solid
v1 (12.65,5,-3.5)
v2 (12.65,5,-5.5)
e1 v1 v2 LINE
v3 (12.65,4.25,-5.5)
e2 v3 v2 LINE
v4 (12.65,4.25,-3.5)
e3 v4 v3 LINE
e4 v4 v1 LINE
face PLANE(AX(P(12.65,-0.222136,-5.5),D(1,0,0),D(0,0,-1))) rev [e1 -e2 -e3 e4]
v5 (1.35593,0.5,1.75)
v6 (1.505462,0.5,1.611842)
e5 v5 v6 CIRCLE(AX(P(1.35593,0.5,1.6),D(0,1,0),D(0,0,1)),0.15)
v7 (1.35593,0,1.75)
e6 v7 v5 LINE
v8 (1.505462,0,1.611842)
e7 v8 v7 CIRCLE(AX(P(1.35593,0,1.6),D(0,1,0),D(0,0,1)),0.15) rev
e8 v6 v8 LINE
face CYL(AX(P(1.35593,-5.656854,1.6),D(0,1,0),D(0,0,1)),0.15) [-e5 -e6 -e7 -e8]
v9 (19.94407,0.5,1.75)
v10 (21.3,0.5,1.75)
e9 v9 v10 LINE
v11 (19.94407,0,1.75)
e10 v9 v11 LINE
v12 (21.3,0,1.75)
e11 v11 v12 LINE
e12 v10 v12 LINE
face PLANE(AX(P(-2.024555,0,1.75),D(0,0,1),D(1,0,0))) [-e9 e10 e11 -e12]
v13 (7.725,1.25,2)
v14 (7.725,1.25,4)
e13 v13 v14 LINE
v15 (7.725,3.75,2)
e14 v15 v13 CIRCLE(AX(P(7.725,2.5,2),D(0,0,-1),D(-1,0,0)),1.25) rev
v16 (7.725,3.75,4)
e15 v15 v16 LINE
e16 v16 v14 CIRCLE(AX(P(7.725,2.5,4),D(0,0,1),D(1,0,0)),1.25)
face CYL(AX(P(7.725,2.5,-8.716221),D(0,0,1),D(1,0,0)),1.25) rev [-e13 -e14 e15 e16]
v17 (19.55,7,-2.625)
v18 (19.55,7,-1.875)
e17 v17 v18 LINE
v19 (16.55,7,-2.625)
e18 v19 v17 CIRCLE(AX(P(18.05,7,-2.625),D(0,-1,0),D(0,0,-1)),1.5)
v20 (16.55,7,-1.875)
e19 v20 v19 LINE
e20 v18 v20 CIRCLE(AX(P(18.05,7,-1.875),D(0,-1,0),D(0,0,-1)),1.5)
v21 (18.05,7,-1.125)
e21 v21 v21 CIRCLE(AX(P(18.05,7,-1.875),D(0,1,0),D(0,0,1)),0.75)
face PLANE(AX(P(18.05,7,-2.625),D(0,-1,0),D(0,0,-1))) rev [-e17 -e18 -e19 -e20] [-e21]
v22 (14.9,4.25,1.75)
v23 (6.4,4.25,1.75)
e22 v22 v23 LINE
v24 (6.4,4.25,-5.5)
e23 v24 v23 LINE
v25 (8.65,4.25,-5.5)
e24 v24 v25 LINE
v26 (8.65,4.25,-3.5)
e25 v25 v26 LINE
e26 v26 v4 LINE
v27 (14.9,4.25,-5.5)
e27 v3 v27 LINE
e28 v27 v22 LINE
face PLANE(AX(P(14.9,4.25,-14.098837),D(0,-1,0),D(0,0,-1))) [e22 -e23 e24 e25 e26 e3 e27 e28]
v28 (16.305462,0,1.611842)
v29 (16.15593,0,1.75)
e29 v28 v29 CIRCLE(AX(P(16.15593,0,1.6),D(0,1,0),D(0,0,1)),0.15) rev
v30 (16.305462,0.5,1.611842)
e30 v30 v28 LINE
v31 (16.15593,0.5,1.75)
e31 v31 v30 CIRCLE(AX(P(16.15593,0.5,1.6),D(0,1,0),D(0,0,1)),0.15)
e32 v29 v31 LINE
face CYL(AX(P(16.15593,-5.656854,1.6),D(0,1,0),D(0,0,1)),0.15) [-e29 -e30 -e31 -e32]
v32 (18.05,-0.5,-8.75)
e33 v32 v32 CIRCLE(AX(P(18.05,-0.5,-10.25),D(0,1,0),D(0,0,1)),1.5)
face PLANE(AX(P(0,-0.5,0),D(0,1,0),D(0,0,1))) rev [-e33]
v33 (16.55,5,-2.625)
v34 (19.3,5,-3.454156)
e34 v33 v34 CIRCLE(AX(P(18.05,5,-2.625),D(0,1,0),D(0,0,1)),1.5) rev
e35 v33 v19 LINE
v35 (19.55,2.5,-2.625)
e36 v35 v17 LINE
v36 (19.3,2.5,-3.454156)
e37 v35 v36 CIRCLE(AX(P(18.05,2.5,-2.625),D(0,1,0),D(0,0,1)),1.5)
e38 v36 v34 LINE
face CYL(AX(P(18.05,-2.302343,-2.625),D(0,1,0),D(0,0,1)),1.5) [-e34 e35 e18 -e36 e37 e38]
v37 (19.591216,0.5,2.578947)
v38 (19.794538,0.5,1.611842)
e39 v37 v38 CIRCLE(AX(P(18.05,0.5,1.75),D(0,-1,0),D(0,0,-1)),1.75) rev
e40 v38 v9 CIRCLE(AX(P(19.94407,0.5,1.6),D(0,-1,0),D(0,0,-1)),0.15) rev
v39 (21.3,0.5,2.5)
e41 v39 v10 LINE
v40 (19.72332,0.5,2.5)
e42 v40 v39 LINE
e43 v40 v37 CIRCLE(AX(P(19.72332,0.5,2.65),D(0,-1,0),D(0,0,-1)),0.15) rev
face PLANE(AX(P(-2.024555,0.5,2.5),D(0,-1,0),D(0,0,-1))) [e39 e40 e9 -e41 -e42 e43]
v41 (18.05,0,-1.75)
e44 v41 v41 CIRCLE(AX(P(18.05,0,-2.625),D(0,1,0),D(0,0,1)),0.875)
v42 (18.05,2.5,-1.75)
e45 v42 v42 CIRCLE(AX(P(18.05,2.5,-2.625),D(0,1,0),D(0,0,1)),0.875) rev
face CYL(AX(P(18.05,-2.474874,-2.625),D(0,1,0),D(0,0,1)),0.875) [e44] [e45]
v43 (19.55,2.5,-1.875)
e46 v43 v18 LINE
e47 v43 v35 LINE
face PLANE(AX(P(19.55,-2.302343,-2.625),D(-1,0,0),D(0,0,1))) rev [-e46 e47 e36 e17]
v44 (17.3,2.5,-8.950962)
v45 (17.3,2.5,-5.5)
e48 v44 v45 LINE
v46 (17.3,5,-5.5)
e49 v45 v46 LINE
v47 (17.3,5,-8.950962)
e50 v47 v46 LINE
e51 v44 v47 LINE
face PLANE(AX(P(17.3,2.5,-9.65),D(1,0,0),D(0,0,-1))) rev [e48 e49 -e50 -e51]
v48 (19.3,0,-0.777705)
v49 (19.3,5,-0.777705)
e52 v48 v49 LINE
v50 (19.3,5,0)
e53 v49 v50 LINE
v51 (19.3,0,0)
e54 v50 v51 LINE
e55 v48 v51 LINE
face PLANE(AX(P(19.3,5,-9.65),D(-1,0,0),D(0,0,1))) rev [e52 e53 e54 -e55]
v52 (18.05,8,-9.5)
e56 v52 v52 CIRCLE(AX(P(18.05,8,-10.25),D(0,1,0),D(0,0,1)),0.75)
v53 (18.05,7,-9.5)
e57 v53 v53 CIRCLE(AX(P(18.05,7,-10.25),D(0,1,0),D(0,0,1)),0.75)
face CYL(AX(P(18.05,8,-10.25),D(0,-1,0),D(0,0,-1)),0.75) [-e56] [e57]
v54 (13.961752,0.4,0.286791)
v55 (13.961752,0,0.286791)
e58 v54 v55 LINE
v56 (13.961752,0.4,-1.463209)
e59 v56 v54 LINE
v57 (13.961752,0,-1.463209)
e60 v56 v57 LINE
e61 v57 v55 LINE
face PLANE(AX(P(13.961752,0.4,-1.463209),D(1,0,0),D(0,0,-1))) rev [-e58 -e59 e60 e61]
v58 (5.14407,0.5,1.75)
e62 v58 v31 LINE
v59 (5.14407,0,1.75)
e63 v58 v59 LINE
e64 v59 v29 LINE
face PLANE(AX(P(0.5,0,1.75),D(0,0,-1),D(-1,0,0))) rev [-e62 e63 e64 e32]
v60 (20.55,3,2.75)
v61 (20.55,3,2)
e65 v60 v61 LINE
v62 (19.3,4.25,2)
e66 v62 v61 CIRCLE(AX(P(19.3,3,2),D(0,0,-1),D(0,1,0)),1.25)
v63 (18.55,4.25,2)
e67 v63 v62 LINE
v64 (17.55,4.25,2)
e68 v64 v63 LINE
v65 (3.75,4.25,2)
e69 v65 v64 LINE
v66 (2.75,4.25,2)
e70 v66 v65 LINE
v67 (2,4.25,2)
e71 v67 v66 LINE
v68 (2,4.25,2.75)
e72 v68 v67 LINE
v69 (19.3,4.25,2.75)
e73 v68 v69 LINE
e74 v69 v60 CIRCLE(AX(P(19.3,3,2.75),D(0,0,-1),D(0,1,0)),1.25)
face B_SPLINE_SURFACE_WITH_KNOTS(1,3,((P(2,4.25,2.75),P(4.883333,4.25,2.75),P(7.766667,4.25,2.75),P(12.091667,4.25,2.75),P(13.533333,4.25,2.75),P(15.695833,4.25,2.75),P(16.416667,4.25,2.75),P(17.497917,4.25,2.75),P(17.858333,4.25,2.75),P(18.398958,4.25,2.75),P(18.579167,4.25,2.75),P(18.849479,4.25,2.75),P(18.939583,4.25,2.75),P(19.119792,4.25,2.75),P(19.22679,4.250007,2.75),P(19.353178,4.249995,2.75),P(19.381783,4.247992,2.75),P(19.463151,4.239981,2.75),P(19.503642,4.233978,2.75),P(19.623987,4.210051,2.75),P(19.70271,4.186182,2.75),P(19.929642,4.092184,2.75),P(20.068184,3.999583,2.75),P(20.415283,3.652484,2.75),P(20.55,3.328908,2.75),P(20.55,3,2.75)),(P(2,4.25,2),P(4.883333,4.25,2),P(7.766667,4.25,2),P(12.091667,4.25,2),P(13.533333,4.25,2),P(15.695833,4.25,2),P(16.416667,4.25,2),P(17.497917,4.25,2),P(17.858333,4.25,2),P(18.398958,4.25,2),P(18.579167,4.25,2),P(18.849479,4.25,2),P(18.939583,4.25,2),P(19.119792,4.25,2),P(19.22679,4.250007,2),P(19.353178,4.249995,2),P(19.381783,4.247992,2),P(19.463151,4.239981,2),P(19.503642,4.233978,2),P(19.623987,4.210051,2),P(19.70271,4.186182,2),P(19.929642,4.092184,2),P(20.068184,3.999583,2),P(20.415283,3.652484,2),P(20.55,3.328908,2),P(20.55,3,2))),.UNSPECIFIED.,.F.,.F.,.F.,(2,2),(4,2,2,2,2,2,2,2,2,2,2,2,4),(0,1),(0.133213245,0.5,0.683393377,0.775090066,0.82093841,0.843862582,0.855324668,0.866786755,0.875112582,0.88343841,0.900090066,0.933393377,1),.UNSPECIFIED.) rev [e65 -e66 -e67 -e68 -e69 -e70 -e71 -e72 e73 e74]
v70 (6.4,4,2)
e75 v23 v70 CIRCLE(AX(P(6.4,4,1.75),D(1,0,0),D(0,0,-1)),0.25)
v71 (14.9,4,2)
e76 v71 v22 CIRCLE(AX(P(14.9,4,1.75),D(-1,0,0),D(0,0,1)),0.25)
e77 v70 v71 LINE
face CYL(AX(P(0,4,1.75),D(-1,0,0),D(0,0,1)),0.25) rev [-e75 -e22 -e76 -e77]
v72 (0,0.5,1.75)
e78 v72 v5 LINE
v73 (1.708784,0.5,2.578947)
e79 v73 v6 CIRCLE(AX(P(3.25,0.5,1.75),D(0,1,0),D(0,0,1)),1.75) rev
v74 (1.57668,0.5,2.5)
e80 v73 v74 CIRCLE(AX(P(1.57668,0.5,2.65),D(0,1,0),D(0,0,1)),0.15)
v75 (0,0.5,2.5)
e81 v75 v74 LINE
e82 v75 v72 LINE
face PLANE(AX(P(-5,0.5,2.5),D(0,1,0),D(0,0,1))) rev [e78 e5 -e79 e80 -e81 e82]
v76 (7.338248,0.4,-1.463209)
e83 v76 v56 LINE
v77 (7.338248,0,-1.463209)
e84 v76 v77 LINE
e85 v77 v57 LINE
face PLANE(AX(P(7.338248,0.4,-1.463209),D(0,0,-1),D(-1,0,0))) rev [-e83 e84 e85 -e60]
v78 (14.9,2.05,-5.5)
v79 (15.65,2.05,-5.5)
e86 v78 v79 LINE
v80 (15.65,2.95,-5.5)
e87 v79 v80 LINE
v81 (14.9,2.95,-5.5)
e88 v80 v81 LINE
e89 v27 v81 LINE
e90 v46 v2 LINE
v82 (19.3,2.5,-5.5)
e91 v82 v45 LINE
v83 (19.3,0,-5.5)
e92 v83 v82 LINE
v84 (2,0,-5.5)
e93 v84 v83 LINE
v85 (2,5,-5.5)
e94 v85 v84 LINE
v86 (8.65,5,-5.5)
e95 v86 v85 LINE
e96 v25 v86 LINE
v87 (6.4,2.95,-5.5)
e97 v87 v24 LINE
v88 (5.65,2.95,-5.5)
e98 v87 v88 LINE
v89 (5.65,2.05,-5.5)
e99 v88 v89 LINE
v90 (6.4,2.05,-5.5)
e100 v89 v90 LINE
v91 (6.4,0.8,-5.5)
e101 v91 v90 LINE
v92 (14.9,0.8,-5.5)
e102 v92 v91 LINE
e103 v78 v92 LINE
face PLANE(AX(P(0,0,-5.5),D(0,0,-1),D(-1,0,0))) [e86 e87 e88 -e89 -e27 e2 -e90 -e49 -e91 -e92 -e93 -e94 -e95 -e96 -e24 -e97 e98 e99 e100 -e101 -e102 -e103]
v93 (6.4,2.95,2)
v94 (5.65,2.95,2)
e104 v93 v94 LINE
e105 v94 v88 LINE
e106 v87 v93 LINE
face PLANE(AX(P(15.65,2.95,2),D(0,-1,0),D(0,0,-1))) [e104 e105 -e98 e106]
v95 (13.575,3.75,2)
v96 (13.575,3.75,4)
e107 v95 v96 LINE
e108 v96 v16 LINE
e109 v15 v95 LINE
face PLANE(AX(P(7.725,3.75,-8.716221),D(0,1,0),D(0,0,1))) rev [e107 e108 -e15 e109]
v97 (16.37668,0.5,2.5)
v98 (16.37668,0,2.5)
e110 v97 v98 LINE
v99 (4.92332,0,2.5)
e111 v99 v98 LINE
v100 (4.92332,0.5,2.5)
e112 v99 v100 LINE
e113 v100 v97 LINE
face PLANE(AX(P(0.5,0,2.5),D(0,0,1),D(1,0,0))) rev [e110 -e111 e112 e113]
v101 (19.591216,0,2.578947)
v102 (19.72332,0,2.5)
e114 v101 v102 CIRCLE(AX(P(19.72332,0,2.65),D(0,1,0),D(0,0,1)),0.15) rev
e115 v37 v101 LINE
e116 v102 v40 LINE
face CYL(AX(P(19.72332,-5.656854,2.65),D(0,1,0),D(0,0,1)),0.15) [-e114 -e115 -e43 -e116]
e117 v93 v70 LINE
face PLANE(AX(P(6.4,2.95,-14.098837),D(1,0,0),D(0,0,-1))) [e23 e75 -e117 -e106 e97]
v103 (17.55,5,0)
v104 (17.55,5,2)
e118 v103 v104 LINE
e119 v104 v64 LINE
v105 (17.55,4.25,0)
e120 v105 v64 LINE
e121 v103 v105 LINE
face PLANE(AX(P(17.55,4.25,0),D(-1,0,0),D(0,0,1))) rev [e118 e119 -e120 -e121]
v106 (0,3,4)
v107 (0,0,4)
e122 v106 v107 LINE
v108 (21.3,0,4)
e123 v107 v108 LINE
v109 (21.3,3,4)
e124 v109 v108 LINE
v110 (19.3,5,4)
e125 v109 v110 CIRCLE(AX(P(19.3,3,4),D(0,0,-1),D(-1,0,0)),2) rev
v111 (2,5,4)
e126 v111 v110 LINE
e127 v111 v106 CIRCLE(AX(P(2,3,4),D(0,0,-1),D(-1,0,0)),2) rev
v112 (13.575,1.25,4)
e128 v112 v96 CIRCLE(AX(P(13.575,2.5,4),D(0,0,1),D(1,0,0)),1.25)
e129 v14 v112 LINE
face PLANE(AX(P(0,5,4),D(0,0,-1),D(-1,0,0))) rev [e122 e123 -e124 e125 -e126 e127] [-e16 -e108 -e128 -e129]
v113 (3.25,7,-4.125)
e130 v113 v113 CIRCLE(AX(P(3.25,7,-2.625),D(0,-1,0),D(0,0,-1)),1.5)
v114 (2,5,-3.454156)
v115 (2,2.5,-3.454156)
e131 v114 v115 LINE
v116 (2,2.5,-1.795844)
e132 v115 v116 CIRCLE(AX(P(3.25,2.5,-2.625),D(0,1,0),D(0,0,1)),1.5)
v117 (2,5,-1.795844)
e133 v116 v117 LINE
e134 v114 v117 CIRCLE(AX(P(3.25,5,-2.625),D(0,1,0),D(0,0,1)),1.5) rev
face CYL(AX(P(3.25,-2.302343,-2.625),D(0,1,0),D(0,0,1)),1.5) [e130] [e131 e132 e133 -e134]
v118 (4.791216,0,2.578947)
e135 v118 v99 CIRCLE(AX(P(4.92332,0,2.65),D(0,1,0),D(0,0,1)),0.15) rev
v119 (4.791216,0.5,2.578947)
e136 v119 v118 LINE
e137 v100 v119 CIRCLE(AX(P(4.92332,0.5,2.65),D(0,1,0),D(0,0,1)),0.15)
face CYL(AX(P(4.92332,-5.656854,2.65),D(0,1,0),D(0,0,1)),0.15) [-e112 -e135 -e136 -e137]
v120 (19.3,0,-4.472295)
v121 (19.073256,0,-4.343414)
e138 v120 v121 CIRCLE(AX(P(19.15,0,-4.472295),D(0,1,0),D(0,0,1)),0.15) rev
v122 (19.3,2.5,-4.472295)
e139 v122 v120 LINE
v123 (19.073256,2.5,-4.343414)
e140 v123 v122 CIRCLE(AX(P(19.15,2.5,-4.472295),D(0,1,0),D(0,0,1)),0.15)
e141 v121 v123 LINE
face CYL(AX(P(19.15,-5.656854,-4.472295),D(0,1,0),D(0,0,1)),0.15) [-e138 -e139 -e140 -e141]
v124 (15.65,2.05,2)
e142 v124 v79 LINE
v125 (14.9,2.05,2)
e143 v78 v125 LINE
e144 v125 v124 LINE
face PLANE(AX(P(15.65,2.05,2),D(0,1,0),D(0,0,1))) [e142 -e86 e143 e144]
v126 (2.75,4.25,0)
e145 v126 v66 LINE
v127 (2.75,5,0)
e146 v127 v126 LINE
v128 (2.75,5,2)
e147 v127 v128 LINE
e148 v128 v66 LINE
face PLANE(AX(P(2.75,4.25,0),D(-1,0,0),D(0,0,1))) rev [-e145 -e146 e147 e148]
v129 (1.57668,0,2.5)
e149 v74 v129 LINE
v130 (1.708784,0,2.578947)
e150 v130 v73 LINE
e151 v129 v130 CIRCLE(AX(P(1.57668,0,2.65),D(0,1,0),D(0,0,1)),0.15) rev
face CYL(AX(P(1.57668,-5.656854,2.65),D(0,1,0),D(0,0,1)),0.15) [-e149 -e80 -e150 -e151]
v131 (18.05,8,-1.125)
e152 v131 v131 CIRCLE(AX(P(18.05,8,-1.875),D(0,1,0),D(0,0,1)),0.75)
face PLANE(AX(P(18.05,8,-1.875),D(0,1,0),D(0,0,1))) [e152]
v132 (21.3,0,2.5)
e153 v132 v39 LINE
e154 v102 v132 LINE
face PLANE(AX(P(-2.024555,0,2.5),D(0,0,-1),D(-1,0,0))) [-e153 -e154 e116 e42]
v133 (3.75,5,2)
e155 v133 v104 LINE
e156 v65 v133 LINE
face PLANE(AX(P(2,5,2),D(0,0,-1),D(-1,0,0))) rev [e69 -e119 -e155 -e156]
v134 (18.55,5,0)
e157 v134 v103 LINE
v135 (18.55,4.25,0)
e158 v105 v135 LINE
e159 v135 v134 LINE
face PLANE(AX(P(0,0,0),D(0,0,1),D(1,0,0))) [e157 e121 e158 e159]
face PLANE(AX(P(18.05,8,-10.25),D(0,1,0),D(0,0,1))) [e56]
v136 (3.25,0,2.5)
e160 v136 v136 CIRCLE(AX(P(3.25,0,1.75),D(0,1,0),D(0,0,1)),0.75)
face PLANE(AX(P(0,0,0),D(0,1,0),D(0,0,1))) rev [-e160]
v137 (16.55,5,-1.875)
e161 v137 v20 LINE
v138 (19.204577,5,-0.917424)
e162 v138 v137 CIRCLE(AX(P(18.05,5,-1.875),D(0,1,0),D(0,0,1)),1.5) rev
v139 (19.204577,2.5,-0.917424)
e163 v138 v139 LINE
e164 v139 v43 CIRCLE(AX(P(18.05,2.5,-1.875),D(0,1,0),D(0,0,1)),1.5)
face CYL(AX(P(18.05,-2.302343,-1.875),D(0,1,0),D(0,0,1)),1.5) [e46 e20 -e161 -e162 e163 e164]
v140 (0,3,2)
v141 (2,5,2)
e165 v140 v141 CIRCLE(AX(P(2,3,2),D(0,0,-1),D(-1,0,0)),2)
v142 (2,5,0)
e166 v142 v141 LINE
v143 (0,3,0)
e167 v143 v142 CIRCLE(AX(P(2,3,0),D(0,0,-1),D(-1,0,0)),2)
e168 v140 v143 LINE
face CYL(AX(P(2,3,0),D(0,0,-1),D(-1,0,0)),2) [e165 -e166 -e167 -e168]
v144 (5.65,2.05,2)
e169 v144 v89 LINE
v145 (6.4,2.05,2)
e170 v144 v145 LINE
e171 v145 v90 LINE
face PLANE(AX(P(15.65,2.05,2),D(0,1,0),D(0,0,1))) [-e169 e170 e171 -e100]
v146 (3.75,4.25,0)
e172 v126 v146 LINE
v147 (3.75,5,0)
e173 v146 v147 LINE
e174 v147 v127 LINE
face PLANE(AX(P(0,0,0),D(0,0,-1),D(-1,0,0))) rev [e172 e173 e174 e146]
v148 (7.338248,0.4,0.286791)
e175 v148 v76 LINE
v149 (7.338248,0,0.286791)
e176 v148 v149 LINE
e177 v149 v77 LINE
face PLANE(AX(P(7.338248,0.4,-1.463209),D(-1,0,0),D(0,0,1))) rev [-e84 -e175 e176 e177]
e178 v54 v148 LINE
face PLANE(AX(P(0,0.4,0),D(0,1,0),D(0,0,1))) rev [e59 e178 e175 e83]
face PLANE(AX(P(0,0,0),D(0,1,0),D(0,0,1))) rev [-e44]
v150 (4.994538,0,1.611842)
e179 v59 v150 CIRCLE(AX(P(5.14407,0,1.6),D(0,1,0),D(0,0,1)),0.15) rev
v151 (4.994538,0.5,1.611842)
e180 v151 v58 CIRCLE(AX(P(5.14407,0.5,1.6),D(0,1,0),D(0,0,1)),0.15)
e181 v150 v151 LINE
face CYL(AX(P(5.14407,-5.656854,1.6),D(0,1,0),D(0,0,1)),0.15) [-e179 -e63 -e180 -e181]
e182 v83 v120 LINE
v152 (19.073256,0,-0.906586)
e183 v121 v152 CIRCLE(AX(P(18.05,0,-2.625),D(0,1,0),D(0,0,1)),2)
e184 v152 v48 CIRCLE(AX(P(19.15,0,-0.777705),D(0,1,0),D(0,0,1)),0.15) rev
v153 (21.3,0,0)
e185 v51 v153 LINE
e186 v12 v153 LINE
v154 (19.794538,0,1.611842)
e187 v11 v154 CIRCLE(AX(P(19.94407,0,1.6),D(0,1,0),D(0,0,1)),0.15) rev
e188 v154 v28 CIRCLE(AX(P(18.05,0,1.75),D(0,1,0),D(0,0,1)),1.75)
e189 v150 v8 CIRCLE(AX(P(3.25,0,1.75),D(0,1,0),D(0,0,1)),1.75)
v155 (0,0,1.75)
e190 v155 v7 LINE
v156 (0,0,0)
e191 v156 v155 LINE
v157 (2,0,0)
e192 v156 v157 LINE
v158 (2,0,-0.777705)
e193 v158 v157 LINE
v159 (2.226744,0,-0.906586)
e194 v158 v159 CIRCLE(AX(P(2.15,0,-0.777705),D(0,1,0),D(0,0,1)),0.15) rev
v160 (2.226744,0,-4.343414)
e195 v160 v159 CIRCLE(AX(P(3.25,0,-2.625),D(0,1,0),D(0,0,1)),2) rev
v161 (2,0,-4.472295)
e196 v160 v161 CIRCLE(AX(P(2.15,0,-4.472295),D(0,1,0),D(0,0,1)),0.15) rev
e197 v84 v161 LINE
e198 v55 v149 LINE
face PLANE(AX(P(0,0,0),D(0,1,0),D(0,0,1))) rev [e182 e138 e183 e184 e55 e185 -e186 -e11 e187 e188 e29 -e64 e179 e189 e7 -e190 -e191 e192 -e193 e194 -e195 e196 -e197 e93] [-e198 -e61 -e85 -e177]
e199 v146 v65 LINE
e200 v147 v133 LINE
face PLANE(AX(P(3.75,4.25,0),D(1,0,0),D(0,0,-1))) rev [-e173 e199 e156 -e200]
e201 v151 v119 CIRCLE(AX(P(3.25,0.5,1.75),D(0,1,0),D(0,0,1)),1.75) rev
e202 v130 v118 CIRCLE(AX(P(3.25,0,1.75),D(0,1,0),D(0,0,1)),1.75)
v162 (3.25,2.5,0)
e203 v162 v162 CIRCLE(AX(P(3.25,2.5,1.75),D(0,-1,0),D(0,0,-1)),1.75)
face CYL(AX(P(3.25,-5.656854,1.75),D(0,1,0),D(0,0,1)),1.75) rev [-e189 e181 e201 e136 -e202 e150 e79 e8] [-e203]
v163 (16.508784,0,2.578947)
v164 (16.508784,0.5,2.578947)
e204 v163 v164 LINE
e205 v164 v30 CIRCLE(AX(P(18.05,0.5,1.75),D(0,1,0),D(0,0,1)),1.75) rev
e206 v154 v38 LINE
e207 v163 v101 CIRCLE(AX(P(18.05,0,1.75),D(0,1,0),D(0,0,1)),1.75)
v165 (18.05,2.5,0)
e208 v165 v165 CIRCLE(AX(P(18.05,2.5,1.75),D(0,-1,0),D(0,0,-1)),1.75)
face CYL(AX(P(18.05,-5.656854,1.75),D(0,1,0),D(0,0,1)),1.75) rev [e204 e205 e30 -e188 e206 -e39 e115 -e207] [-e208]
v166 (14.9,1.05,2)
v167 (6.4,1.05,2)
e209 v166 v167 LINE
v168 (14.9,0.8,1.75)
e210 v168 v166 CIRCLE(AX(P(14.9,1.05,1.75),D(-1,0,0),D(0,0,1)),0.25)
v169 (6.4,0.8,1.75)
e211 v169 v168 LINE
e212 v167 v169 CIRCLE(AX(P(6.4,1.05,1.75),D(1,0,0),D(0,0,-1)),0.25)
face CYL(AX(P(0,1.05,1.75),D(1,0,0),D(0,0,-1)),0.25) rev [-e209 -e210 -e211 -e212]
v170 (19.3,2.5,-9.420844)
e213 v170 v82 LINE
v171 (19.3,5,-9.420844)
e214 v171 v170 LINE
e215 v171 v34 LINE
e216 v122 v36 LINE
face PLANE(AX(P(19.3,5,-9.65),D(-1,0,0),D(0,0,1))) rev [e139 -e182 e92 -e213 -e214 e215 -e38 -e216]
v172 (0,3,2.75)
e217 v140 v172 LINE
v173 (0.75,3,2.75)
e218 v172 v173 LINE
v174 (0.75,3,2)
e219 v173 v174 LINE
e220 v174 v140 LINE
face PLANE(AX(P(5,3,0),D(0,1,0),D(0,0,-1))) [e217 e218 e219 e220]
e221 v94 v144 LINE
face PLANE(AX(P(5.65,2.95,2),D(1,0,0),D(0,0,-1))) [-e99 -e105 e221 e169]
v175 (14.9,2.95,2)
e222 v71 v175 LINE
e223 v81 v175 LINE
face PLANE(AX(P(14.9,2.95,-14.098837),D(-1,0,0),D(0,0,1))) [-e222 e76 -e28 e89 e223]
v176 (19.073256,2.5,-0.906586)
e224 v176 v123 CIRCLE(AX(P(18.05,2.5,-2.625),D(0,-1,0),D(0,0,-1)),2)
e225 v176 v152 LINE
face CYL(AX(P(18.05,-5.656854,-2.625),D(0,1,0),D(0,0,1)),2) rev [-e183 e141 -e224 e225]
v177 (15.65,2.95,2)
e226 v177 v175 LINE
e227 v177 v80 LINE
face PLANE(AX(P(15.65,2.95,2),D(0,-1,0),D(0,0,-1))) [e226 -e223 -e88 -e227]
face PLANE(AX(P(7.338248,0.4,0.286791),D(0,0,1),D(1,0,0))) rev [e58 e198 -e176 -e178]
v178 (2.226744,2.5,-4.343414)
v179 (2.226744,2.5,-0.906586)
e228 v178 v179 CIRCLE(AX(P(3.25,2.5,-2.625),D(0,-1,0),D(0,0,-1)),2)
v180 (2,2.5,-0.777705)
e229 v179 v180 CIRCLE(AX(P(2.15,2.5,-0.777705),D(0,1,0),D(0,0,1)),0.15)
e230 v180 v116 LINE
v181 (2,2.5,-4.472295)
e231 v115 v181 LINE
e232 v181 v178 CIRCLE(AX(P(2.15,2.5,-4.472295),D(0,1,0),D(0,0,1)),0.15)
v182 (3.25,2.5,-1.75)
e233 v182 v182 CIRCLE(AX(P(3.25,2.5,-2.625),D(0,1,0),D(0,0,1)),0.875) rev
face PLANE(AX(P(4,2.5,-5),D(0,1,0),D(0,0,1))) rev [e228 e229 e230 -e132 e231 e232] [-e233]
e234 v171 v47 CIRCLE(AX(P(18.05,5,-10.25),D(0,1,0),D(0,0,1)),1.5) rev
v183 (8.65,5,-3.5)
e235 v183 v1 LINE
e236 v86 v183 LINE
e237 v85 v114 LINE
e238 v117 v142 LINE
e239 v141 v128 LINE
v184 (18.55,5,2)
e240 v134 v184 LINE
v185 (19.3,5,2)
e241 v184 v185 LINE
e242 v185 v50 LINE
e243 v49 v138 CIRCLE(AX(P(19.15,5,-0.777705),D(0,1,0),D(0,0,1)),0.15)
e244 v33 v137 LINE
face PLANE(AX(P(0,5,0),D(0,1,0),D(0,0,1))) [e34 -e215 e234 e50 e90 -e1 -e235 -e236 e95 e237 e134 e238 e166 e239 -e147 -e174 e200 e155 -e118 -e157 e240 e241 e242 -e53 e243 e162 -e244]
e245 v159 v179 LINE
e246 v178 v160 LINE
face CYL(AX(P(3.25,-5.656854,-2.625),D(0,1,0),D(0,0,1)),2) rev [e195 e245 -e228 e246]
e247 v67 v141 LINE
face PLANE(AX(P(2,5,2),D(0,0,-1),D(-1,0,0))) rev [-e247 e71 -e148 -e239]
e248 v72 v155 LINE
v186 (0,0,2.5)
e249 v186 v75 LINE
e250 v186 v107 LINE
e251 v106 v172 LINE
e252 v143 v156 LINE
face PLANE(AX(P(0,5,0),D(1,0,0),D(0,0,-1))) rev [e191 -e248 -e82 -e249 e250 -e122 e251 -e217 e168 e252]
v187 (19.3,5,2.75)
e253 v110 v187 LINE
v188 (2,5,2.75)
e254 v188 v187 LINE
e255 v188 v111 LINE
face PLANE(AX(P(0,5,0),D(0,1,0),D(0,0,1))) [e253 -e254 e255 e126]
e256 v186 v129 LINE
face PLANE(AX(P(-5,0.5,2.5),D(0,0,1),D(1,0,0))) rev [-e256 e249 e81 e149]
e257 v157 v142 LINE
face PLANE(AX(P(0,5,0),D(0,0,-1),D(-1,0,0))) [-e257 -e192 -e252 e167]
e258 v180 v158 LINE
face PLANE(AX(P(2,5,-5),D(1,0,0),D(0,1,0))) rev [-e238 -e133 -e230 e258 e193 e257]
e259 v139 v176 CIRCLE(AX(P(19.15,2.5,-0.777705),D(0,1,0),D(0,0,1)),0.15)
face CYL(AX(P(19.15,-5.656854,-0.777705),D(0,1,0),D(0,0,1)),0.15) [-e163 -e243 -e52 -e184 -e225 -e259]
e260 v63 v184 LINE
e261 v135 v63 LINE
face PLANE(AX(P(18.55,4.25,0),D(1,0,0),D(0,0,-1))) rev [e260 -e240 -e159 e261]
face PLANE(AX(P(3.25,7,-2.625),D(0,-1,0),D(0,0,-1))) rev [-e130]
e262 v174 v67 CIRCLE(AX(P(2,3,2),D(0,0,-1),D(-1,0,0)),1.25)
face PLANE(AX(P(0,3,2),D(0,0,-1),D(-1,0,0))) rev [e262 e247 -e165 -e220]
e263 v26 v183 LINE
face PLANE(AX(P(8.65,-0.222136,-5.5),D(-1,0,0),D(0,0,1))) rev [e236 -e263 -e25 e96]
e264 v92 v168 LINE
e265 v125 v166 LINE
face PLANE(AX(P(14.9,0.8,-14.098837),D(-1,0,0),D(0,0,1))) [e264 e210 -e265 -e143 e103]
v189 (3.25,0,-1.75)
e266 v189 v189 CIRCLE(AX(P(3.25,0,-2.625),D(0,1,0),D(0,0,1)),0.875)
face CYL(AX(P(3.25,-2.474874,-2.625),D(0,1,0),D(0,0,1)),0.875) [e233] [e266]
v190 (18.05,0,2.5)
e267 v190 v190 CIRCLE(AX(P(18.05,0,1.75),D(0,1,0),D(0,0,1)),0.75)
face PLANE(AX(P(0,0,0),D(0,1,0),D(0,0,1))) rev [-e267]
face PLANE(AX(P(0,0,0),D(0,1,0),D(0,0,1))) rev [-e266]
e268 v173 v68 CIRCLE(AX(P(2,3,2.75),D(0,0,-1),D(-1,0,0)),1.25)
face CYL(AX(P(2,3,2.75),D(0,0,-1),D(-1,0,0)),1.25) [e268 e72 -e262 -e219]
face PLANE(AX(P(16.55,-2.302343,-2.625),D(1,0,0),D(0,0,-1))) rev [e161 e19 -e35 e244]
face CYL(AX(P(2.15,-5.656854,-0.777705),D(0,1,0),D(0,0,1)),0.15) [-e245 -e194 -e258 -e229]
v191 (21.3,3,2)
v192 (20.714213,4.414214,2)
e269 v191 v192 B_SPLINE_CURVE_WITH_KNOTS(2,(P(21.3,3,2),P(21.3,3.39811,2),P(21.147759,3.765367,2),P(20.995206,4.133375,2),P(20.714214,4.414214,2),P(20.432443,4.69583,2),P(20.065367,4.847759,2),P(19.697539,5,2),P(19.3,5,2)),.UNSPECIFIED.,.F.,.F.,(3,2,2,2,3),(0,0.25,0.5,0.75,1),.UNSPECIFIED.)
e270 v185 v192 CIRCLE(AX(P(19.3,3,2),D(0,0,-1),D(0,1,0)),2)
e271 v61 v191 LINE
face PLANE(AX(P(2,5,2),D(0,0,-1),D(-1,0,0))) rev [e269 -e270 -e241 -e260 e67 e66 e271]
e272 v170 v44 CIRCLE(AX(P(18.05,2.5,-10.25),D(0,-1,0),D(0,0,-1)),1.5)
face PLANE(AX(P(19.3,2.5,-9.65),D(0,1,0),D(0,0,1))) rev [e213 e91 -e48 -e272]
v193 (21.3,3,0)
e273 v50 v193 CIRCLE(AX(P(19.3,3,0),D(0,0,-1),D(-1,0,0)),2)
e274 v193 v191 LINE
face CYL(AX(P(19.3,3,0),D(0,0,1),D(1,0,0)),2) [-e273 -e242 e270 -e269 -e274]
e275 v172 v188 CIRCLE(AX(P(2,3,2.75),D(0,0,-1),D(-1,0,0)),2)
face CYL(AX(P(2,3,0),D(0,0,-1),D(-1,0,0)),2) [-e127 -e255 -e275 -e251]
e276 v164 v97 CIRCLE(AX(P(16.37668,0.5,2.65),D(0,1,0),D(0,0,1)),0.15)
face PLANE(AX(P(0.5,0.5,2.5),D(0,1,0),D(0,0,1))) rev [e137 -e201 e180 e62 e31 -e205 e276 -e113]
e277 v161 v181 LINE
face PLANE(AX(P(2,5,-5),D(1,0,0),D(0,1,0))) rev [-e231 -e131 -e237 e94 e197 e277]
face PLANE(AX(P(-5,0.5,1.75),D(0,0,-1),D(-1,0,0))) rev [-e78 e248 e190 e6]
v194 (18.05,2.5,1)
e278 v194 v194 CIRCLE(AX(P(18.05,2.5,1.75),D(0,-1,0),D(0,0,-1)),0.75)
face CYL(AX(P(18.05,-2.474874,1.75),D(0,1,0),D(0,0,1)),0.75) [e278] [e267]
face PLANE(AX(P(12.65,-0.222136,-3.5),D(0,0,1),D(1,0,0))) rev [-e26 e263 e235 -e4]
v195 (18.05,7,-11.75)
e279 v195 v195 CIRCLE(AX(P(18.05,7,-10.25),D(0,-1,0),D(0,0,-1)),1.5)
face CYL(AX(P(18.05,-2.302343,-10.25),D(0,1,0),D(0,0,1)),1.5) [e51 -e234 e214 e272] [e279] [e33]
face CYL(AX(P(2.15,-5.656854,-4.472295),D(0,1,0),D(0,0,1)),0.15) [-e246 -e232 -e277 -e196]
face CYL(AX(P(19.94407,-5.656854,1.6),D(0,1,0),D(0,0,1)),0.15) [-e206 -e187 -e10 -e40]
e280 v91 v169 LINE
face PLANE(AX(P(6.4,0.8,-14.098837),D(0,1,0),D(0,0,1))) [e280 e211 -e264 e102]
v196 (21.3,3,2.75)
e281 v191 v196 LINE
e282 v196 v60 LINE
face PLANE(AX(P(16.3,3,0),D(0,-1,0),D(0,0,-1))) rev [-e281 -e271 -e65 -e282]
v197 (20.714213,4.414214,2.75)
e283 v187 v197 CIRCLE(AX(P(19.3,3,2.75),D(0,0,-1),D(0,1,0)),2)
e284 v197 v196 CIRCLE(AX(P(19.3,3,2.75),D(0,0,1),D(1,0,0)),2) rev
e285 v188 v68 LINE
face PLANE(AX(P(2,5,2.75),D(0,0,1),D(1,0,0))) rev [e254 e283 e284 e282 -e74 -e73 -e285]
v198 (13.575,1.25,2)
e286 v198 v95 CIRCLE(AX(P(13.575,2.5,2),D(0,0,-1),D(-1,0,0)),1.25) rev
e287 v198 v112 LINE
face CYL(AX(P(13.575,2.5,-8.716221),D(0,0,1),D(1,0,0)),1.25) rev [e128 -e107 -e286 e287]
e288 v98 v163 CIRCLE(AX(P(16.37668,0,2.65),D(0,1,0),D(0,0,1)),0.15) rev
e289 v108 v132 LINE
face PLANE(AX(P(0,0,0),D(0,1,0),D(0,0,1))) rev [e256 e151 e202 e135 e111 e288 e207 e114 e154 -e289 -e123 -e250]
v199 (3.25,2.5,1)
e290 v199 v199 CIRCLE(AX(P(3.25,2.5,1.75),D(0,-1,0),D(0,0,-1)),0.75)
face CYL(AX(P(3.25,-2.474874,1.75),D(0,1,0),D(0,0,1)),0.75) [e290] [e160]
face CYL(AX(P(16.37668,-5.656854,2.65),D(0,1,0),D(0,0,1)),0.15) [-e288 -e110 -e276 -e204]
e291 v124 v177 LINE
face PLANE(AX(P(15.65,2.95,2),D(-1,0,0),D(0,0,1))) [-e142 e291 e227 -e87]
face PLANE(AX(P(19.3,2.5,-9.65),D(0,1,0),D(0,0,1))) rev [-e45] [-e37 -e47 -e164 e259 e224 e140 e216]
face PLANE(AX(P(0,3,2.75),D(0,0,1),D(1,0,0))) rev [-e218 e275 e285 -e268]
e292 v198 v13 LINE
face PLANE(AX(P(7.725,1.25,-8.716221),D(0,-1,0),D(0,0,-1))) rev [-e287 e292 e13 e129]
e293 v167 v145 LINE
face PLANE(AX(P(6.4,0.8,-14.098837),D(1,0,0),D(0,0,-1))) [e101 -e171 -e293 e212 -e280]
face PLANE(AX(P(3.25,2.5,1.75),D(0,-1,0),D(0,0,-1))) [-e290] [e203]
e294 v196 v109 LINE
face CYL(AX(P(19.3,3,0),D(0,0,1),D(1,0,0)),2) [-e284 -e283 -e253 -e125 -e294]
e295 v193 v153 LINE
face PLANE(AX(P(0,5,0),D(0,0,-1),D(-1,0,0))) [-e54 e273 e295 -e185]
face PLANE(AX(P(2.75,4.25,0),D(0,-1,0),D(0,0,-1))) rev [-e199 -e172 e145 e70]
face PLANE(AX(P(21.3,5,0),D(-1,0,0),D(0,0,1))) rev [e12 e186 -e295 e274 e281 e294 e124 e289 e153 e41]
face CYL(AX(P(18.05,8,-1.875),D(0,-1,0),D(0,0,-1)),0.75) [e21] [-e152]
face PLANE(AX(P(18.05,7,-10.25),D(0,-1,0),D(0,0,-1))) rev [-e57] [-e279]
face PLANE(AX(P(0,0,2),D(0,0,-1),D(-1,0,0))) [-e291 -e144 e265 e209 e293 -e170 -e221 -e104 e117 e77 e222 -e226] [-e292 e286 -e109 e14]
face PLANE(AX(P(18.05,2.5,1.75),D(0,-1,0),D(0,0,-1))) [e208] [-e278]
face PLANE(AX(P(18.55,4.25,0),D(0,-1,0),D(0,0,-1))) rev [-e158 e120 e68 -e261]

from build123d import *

# Parameters (mm, degrees)
SKETCH1_W                    = 21.3
SKETCH1_H                    = 4
FRONT_DEPTH                  = 5
FRONT_FILLET_R               = 2
TYPE_C_DEPTH                 = 4
TYPE_C_INSIDE_FILET_R        = 0.1
SKETCH15_W                   = 2
SKETCH15_H                   = 2.5
LEFT_BODY_DEPTH              = 9.65
SKETCH16_W                   = 2
SKETCH16_H                   = 2.5
RIGHT_BODY_DEPTH             = 5
SKETCH32_R                   = 1.5
POSTS_DEPTH                  = 2
POSTS_DIRECTION_2_REACH      = 25.913
SKETCH_44_W                  = 17.3
SKETCH_44_H                  = 5
BODY_DEPTH                   = 5.5
SKETCH56_R                   = 2
SKETCH56_R_2                 = 1.75
TOP_POSTS_CUT_DEPTH          = 2.5
SKETCH90_W                   = 6.623504636
SKETCH90_H                   = 1.75
TOP_SLOT_DEPTH               = 0.4
SKETCH37_R                   = 0.75
SKETCH37_R_2                 = 0.875
TOP_POSTS_DEPTH              = 2.5
SKETCH94_R                   = 1.5
TOP_POSTS_BACK_DEPTH         = 3
SKETCH38_R                   = 0.75
BOTTOM_POSTS_DEPTH           = 1
PCB_DEPTH                    = 2
PCB_DEPTH_BACK               = 5.5
SKETCH43_W                   = 10
SKETCH43_H                   = 0.9
SKETCH91_W                   = 8.5
SKETCH91_H                   = 1.3
PCB_TOP_BOTTOM_DEPTH         = 7.5
PCB_TOP_BOTTOM_FILLET_R      = 0.25
SKETCH95_W                   = 4
SKETCH95_H                   = 2
LATCH_DEPTH                  = 0.75
SKETCH83_W                   = 0.75
SKETCH83_H                   = 0.5
SKETCH89_W                   = 0.5
SKETCH89_H                   = 0.75
SKETCH86_W                   = 0.5
SKETCH86_H                   = 0.75
SKETCH75_W                   = 0.75
SKETCH75_H                   = 0.75
SKETCH93_W                   = 1
SKETCH93_H                   = 0.75
BOTTOM_GROOVE_SUPPORTS_DEPTH = 2
WALL_START                   = -1
WALL_THICKNESS_DEPTH         = 3.5
WALL_START_2                 = 1.5137
WALL_THICKNESS_2_DEPTH       = 4.4863
WALL_THICKNESS_3_DEPTH       = 1.5


with BuildPart() as part:
    # Sketch1 → Front (new body)
    with BuildSketch(Plane(origin=(0, 0, 0), x_dir=(1, 0, 0), z_dir=(0, 1, 0))):
        with Locations((10.65, -2)):
            Rectangle(SKETCH1_W, SKETCH1_H)
    extrude(amount=FRONT_DEPTH)

    # Front Fillet
    front_fillet_edges = [part.edges().sort_by_distance(p)[0] for p in [
        (0, 5, 2),
        (21.3, 5, 2),
    ]]
    fillet(front_fillet_edges, radius=FRONT_FILLET_R)

    # Sketch41 → Type-C (cut)
    with BuildSketch(Plane.XY.offset(4)):
        with BuildLine():
            Line((7.725, 3.75), (13.575, 3.75))
            ThreePointArc((13.575, 3.75), (14.825, 2.5), (13.575, 1.25))
            Line((13.575, 1.25), (7.725, 1.25))
            ThreePointArc((7.725, 1.25), (6.475, 2.5), (7.725, 3.75))
        make_face()
    extrude(amount=-TYPE_C_DEPTH, mode=Mode.SUBTRACT)

    # Type-C Inside Filet
    type_c_inside_filet_edges = [part.edges().sort_by_distance(p)[0] for p in [
        (10.65, 1.25, 0),
        (14.825, 2.5, 0),
        (10.65, 3.75, 0),
        (6.475, 2.5, 0),
    ]]
    fillet(type_c_inside_filet_edges, radius=TYPE_C_INSIDE_FILET_R)

    # Sketch15 → Left Body (add)
    with BuildSketch(Plane(origin=(0, 0, 0), x_dir=(-1, 0, 0), z_dir=(0, 0, -1))):
        with Locations((-18.3, 3.75)):
            Rectangle(SKETCH15_W, SKETCH15_H)
    extrude(amount=LEFT_BODY_DEPTH)

    # Sketch16 → Right Body (add)
    with BuildSketch(Plane(origin=(0, 0, 0), x_dir=(-1, 0, 0), z_dir=(0, 0, -1))):
        with Locations((-3, 3.75)):
            Rectangle(SKETCH16_W, SKETCH16_H)
    extrude(amount=RIGHT_BODY_DEPTH)

    # Sketch32 → Posts (add)
    with BuildSketch(Plane(origin=(0, 5, 0), x_dir=(-1, 0, 0), z_dir=(0, -1, 0))):
        with Locations(Location((-18.05, 10.25, 0), (0, 0, 300))):
            Circle(SKETCH32_R)
        with Locations(Location((-3.25, 2.625, 0), (0, 0, 240))):
            Circle(SKETCH32_R)
        with BuildLine():
            Line((-16.55, 2.625), (-16.55, 1.875))
            ThreePointArc((-16.55, 1.875), (-18.05, 0.375), (-19.55, 1.875))
            Line((-19.55, 1.875), (-19.55, 2.625))
            ThreePointArc((-19.55, 2.625), (-18.05, 4.125), (-16.55, 2.625))
        make_face()
    extrude(amount=-POSTS_DEPTH)

    # Posts direction 2: up to this face of the body (flat: up to its plane)
    posts_direction_2_end = Plane(part.part.faces().sort_by_distance((18.3, 2.5, -4.825))[0])
    # Sketch32 → Posts direction 2 (add, up to the picked face)
    with BuildSketch(Plane(origin=(0, 5, 0), x_dir=(-1, 0, 0), z_dir=(0, -1, 0)), mode=Mode.PRIVATE) as posts_direction_2_sk1:
        with Locations(Location((-18.05, 10.25, 0), (0, 0, 300))):
            Circle(SKETCH32_R)
    posts_direction_2_tool1 = split(extrude(posts_direction_2_sk1.sketch, amount=POSTS_DIRECTION_2_REACH, mode=Mode.PRIVATE), bisect_by=posts_direction_2_end, keep=Keep.BOTH, mode=Mode.PRIVATE)
    # Sketch32 → Posts direction 2 (add, up to the picked face)
    with BuildSketch(Plane(origin=(0, 5, 0), x_dir=(-1, 0, 0), z_dir=(0, -1, 0)), mode=Mode.PRIVATE) as posts_direction_2_sk2:
        with Locations(Location((-3.25, 2.625, 0), (0, 0, 240))):
            Circle(SKETCH32_R)
    posts_direction_2_tool2 = split(extrude(posts_direction_2_sk2.sketch, amount=POSTS_DIRECTION_2_REACH, mode=Mode.PRIVATE), bisect_by=posts_direction_2_end, keep=Keep.BOTH, mode=Mode.PRIVATE)
    # Sketch32 → Posts direction 2 (add, up to the picked face)
    with BuildSketch(Plane(origin=(0, 5, 0), x_dir=(-1, 0, 0), z_dir=(0, -1, 0)), mode=Mode.PRIVATE) as posts_direction_2_sk3:
        with BuildLine():
            Line((-16.55, 2.625), (-16.55, 1.875))
            ThreePointArc((-16.55, 1.875), (-18.05, 0.375), (-19.55, 1.875))
            Line((-19.55, 1.875), (-19.55, 2.625))
            ThreePointArc((-19.55, 2.625), (-18.05, 4.125), (-16.55, 2.625))
        make_face()
    posts_direction_2_tool3 = split(extrude(posts_direction_2_sk3.sketch, amount=POSTS_DIRECTION_2_REACH, mode=Mode.PRIVATE), bisect_by=posts_direction_2_end, keep=Keep.BOTH, mode=Mode.PRIVATE)
    add(posts_direction_2_tool1.solids().sort_by(Axis((18.05, 5, -10.25), (0, -1, 0)))[0])
    add(posts_direction_2_tool2.solids().sort_by(Axis((3.25, 5, -2.625), (0, -1, 0)))[0])
    add(posts_direction_2_tool3.solids().sort_by(Axis((18.05, 5, -2.25), (0, -1, 0)))[0])

    # Sketch 44 → Body (add)
    with BuildSketch(Plane.XY):
        with Locations((10.65, 2.5)):
            Rectangle(SKETCH_44_W, SKETCH_44_H)
    extrude(amount=-BODY_DEPTH)

    # Sketch56 → Top Posts Cut (cut)
    with BuildSketch(Plane(origin=(0, 2.5, 0), x_dir=(-1, 0, 0), z_dir=(0, -1, 0))):
        with Locations((-18.05, 2.625)):
            Circle(SKETCH56_R)
        with Locations((-3.25, 2.625)):
            Circle(SKETCH56_R)
        with Locations(Location((-18.05, -1.75, 0), (0, 0, 270))):
            Circle(SKETCH56_R_2)
        with Locations(Location((-3.25, -1.75, 0), (0, 0, 270))):
            Circle(SKETCH56_R_2)
    extrude(amount=TOP_POSTS_CUT_DEPTH, mode=Mode.SUBTRACT)

    # Sketch90 → Top Slot (cut)
    with BuildSketch(Plane.XZ):
        with Locations((10.65, -0.588209251)):
            Rectangle(SKETCH90_W, SKETCH90_H)
    extrude(amount=-TOP_SLOT_DEPTH, mode=Mode.SUBTRACT)

    # Sketch37 → Top Posts (add)
    with BuildSketch(Plane(origin=(0, 2.5, 0), x_dir=(-1, 0, 0), z_dir=(0, -1, 0))):
        with Locations(Location((-3.25, -1.75, 0), (0, 0, 270))):
            Circle(SKETCH37_R)
        with Locations(Location((-18.05, 2.625, 0), (0, 0, 270))):
            Circle(SKETCH37_R_2)
        with Locations(Location((-3.25, 2.625, 0), (0, 0, 270))):
            Circle(SKETCH37_R_2)
        with Locations(Location((-18.05, -1.75, 0), (0, 0, 270))):
            Circle(SKETCH37_R)
    extrude(amount=TOP_POSTS_DEPTH)

    # Sketch94 → Top Posts Back (add)
    with BuildSketch(Plane.XZ.offset(-2.5)):
        with Locations(Location((18.05, -10.25, 0), (0, 0, 90))):
            Circle(SKETCH94_R)
    extrude(amount=TOP_POSTS_BACK_DEPTH)

    # Sketch38 → Bottom Posts (add)
    with BuildSketch(Plane(origin=(0, 7, 0), x_dir=(1, 0, 0), z_dir=(0, 1, 0))):
        with Locations(Location((18.05, 10.25, 0), (0, 0, 270))):
            Circle(SKETCH38_R)
        with Locations(Location((18.05, 1.875, 0), (0, 0, 270))):
            Circle(SKETCH38_R)
    extrude(amount=BOTTOM_POSTS_DEPTH)

    # Sketch43 → PCB (cut, two sides: drawn at the far end of the back side and taken through both)
    with BuildSketch(Plane.XY.offset(-PCB_DEPTH_BACK)):
        with Locations((10.65, 2.5)):
            Rectangle(SKETCH43_W, SKETCH43_H)
    extrude(amount=PCB_DEPTH + PCB_DEPTH_BACK, mode=Mode.SUBTRACT)

    # Sketch91 → PCB Top/Bottom (cut)
    with BuildSketch(Plane(origin=(0, 0, 2), x_dir=(-1, 0, 0), z_dir=(0, 0, -1))):
        with Locations((-10.65, 1.45)):
            Rectangle(SKETCH91_W, SKETCH91_H)
        with Locations((-10.65, 3.6)):
            Rectangle(SKETCH91_W, SKETCH91_H)
    extrude(amount=PCB_TOP_BOTTOM_DEPTH, mode=Mode.SUBTRACT)

    # PCB Top/Bottom Fillet
    pcb_top_bottom_fillet_edges = [part.edges().sort_by_distance(p)[0] for p in [
        (10.65, 0.8, 2),
        (10.65, 4.25, 2),
    ]]
    fillet(pcb_top_bottom_fillet_edges, radius=PCB_TOP_BOTTOM_FILLET_R)

    # Sketch95 → Latch (cut)
    with BuildSketch(Plane(origin=(0, 5, 0), x_dir=(1, 0, 0), z_dir=(0, 1, 0))):
        with Locations((10.65, 4.5)):
            Rectangle(SKETCH95_W, SKETCH95_H)
    extrude(amount=-LATCH_DEPTH, mode=Mode.SUBTRACT)

    # Top Groove Middle: sweep along a curve in space
    with BuildLine() as top_groove_middle_path:
        Line((4.83113883, 0, 2.5), (16.46886117, 0, 2.5))
    # Sketch83 → Top Groove Middle (sweep, cut)
    with BuildSketch(Plane(origin=(4.83113883, 0, 2.5), x_dir=(0, 0, -1), z_dir=(1, 0, 0))):
        with Locations((0.375, 0.25)):
            Rectangle(SKETCH83_W, SKETCH83_H)
    sweep(path=top_groove_middle_path.line, mode=Mode.SUBTRACT)

    # Top Groove Left: sweep along a curve in space
    with BuildLine() as top_groove_left_path:
        Line((19.63113883, 0, 2.5), (21.3, 0, 2.5))
    # Sketch89 → Top Groove Left (sweep, cut)
    with BuildSketch(Plane(origin=(21.3, 2, 1.7), x_dir=(0, 1, 0), z_dir=(-1, 0, 0))):
        with Locations((-1.75, -0.425)):
            Rectangle(SKETCH89_W, SKETCH89_H)
    sweep(path=top_groove_left_path.line, mode=Mode.SUBTRACT)

    # Top Groove Right: sweep along a curve in space
    with BuildLine() as top_groove_right_path:
        Line((0, 0, 2.5), (1.66886117, 0, 2.5))
    # Sketch86 → Top Groove Right (sweep, cut)
    with BuildSketch(Plane(origin=(0, 2, 1.7), x_dir=(0, -1, 0), z_dir=(1, 0, 0))):
        with Locations((1.75, -0.425)):
            Rectangle(SKETCH86_W, SKETCH86_H)
    sweep(path=top_groove_right_path.line, mode=Mode.SUBTRACT)

    # Bottom Groove: sweep along a curve in space
    with BuildLine() as bottom_groove_path:
        ThreePointArc((21.3, 3, 2.75), (20.714213562, 4.414213562, 2.75), (19.3, 5, 2.75))
        Line((19.3, 5, 2.75), (2, 5, 2.75))
        ThreePointArc((2, 5, 2.75), (0.585786438, 4.414213562, 2.75), (0, 3, 2.75))
    # Sketch75 → Bottom Groove (sweep, cut)
    with BuildSketch(Plane(origin=(19.3, 5, 4), x_dir=(0, 0, -1), z_dir=(1, 0, 0))):
        with Locations((1.625, -0.375)):
            Rectangle(SKETCH75_W, SKETCH75_H)
    sweep(path=bottom_groove_path.line, mode=Mode.SUBTRACT)

    # Sketch93 → Bottom Groove Supports (cut)
    with BuildSketch(Plane.XY.offset(2)):
        with Locations((18.05, 4.625)):
            Rectangle(SKETCH93_W, SKETCH93_H)
        with Locations((3.25, 4.625)):
            Rectangle(SKETCH93_W, SKETCH93_H)
    extrude(amount=-BOTTOM_GROOVE_SUPPORTS_DEPTH, mode=Mode.SUBTRACT)

    # Wall Thickness: read off the stored shape, not the designer's step
    # Wall Thickness outline → Wall Thickness (cut)
    with BuildSketch(Plane(origin=(0, 0, 0), x_dir=(1, 0, 0), z_dir=(0, 1, 0)).offset(WALL_START)):
        with BuildLine():
            ThreePointArc((19.3, 4.47229532), (19.224122777, 4.341888978), (19.073255814, 4.343414251))
            ThreePointArc((19.073255814, 4.343414251), (19.189341121, 4.268746274), (19.3, 4.1862495))
            Line((19.3, 4.1862495), (19.3, 4.47229532))
        make_face()
        with BuildLine():
            Line((19.3, 0.77770468), (19.3, 1.0637505))
            ThreePointArc((19.3, 1.0637505), (19.189341121, 0.981253726), (19.073255814, 0.906585749))
            ThreePointArc((19.073255814, 0.906585749), (19.224122777, 0.908111022), (19.3, 0.77770468))
        make_face()
        with BuildLine():
            ThreePointArc((2, 0.77770468), (2.075877223, 0.908111022), (2.226744186, 0.906585749))
            ThreePointArc((2.226744186, 0.906585749), (2.110658879, 0.981253726), (2, 1.0637505))
            Line((2, 1.0637505), (2, 0.77770468))
        make_face()
        with BuildLine():
            ThreePointArc((2, 4.1862495), (2.110658879, 4.268746274), (2.226744186, 4.343414251))
            ThreePointArc((2.226744186, 4.343414251), (2.075877223, 4.341888978), (2, 4.47229532))
            Line((2, 4.47229532), (2, 4.1862495))
        make_face()
    extrude(amount=WALL_THICKNESS_DEPTH, mode=Mode.SUBTRACT)

    # Wall Thickness 2 outline → Wall Thickness 2 (cut)
    with BuildSketch(Plane(origin=(0, 0, 0), x_dir=(1, 0, 0), z_dir=(0, 1, 0)).offset(WALL_START_2)):
        with BuildLine():
            ThreePointArc((19.204576743, 0.917423609), (19.273867896, 0.862302223), (19.3, 0.77770468))
            Line((19.3, 0.77770468), (19.3, 1.045843802))
            ThreePointArc((19.3, 1.045843802), (19.254001771, 0.980360556), (19.204576743, 0.917423609))
        make_face()
    extrude(amount=WALL_THICKNESS_2_DEPTH, mode=Mode.SUBTRACT)

    # Wall Thickness 3 outline → Wall Thickness 3 (cut)
    with BuildSketch(Plane(origin=(0, 0, 0), x_dir=(1, 0, 0), z_dir=(0, 1, 0)).offset(WALL_START)):
        with BuildLine():
            ThreePointArc((1.576679947, -2.5), (1.653628323, -2.521240739), (1.708784162, -2.578947368))
            ThreePointArc((1.708784162, -2.578947368), (1.688323708, -2.539726003), (1.66886117, -2.5))
            Line((1.66886117, -2.5), (1.576679947, -2.5))
        make_face()
        with BuildLine():
            ThreePointArc((4.83113883, -2.5), (4.811676292, -2.539726003), (4.791215838, -2.578947368))
            ThreePointArc((4.791215838, -2.578947368), (4.846371677, -2.521240739), (4.923320053, -2.5))
            Line((4.923320053, -2.5), (4.83113883, -2.5))
        make_face()
        with BuildLine():
            Line((1.355930308, -1.75), (1.5, -1.75))
            ThreePointArc((1.5, -1.75), (1.501366065, -1.680867087), (1.505462125, -1.611842105))
            ThreePointArc((1.505462125, -1.611842105), (1.457723441, -1.710173308), (1.355930308, -1.75))
        make_face()
        with BuildLine():
            Line((16.46886117, -2.5), (16.376679947, -2.5))
            ThreePointArc((16.376679947, -2.5), (16.453628323, -2.521240739), (16.508784162, -2.578947368))
            ThreePointArc((16.508784162, -2.578947368), (16.488323708, -2.539726003), (16.46886117, -2.5))
        make_face()
        with BuildLine():
            ThreePointArc((4.994537875, -1.611842105), (4.998633935, -1.680867087), (5, -1.75))
            Line((5, -1.75), (5.144069692, -1.75))
            ThreePointArc((5.144069692, -1.75), (5.042276559, -1.710173308), (4.994537875, -1.611842105))
        make_face()
        with BuildLine():
            ThreePointArc((19.63113883, -2.5), (19.611676292, -2.539726003), (19.591215838, -2.578947368))
            ThreePointArc((19.591215838, -2.578947368), (19.646371677, -2.521240739), (19.723320053, -2.5))
            Line((19.723320053, -2.5), (19.63113883, -2.5))
        make_face()
        with BuildLine():
            Line((16.155930308, -1.75), (16.3, -1.75))
            ThreePointArc((16.3, -1.75), (16.301366065, -1.680867087), (16.305462125, -1.611842105))
            ThreePointArc((16.305462125, -1.611842105), (16.257723441, -1.710173308), (16.155930308, -1.75))
        make_face()
        with BuildLine():
            ThreePointArc((19.794537875, -1.611842105), (19.798633935, -1.680867087), (19.8, -1.75))
            Line((19.8, -1.75), (19.944069692, -1.75))
            ThreePointArc((19.944069692, -1.75), (19.842276559, -1.710173308), (19.794537875, -1.611842105))
        make_face()
    extrude(amount=WALL_THICKNESS_3_DEPTH, mode=Mode.SUBTRACT)


solid = part.part
